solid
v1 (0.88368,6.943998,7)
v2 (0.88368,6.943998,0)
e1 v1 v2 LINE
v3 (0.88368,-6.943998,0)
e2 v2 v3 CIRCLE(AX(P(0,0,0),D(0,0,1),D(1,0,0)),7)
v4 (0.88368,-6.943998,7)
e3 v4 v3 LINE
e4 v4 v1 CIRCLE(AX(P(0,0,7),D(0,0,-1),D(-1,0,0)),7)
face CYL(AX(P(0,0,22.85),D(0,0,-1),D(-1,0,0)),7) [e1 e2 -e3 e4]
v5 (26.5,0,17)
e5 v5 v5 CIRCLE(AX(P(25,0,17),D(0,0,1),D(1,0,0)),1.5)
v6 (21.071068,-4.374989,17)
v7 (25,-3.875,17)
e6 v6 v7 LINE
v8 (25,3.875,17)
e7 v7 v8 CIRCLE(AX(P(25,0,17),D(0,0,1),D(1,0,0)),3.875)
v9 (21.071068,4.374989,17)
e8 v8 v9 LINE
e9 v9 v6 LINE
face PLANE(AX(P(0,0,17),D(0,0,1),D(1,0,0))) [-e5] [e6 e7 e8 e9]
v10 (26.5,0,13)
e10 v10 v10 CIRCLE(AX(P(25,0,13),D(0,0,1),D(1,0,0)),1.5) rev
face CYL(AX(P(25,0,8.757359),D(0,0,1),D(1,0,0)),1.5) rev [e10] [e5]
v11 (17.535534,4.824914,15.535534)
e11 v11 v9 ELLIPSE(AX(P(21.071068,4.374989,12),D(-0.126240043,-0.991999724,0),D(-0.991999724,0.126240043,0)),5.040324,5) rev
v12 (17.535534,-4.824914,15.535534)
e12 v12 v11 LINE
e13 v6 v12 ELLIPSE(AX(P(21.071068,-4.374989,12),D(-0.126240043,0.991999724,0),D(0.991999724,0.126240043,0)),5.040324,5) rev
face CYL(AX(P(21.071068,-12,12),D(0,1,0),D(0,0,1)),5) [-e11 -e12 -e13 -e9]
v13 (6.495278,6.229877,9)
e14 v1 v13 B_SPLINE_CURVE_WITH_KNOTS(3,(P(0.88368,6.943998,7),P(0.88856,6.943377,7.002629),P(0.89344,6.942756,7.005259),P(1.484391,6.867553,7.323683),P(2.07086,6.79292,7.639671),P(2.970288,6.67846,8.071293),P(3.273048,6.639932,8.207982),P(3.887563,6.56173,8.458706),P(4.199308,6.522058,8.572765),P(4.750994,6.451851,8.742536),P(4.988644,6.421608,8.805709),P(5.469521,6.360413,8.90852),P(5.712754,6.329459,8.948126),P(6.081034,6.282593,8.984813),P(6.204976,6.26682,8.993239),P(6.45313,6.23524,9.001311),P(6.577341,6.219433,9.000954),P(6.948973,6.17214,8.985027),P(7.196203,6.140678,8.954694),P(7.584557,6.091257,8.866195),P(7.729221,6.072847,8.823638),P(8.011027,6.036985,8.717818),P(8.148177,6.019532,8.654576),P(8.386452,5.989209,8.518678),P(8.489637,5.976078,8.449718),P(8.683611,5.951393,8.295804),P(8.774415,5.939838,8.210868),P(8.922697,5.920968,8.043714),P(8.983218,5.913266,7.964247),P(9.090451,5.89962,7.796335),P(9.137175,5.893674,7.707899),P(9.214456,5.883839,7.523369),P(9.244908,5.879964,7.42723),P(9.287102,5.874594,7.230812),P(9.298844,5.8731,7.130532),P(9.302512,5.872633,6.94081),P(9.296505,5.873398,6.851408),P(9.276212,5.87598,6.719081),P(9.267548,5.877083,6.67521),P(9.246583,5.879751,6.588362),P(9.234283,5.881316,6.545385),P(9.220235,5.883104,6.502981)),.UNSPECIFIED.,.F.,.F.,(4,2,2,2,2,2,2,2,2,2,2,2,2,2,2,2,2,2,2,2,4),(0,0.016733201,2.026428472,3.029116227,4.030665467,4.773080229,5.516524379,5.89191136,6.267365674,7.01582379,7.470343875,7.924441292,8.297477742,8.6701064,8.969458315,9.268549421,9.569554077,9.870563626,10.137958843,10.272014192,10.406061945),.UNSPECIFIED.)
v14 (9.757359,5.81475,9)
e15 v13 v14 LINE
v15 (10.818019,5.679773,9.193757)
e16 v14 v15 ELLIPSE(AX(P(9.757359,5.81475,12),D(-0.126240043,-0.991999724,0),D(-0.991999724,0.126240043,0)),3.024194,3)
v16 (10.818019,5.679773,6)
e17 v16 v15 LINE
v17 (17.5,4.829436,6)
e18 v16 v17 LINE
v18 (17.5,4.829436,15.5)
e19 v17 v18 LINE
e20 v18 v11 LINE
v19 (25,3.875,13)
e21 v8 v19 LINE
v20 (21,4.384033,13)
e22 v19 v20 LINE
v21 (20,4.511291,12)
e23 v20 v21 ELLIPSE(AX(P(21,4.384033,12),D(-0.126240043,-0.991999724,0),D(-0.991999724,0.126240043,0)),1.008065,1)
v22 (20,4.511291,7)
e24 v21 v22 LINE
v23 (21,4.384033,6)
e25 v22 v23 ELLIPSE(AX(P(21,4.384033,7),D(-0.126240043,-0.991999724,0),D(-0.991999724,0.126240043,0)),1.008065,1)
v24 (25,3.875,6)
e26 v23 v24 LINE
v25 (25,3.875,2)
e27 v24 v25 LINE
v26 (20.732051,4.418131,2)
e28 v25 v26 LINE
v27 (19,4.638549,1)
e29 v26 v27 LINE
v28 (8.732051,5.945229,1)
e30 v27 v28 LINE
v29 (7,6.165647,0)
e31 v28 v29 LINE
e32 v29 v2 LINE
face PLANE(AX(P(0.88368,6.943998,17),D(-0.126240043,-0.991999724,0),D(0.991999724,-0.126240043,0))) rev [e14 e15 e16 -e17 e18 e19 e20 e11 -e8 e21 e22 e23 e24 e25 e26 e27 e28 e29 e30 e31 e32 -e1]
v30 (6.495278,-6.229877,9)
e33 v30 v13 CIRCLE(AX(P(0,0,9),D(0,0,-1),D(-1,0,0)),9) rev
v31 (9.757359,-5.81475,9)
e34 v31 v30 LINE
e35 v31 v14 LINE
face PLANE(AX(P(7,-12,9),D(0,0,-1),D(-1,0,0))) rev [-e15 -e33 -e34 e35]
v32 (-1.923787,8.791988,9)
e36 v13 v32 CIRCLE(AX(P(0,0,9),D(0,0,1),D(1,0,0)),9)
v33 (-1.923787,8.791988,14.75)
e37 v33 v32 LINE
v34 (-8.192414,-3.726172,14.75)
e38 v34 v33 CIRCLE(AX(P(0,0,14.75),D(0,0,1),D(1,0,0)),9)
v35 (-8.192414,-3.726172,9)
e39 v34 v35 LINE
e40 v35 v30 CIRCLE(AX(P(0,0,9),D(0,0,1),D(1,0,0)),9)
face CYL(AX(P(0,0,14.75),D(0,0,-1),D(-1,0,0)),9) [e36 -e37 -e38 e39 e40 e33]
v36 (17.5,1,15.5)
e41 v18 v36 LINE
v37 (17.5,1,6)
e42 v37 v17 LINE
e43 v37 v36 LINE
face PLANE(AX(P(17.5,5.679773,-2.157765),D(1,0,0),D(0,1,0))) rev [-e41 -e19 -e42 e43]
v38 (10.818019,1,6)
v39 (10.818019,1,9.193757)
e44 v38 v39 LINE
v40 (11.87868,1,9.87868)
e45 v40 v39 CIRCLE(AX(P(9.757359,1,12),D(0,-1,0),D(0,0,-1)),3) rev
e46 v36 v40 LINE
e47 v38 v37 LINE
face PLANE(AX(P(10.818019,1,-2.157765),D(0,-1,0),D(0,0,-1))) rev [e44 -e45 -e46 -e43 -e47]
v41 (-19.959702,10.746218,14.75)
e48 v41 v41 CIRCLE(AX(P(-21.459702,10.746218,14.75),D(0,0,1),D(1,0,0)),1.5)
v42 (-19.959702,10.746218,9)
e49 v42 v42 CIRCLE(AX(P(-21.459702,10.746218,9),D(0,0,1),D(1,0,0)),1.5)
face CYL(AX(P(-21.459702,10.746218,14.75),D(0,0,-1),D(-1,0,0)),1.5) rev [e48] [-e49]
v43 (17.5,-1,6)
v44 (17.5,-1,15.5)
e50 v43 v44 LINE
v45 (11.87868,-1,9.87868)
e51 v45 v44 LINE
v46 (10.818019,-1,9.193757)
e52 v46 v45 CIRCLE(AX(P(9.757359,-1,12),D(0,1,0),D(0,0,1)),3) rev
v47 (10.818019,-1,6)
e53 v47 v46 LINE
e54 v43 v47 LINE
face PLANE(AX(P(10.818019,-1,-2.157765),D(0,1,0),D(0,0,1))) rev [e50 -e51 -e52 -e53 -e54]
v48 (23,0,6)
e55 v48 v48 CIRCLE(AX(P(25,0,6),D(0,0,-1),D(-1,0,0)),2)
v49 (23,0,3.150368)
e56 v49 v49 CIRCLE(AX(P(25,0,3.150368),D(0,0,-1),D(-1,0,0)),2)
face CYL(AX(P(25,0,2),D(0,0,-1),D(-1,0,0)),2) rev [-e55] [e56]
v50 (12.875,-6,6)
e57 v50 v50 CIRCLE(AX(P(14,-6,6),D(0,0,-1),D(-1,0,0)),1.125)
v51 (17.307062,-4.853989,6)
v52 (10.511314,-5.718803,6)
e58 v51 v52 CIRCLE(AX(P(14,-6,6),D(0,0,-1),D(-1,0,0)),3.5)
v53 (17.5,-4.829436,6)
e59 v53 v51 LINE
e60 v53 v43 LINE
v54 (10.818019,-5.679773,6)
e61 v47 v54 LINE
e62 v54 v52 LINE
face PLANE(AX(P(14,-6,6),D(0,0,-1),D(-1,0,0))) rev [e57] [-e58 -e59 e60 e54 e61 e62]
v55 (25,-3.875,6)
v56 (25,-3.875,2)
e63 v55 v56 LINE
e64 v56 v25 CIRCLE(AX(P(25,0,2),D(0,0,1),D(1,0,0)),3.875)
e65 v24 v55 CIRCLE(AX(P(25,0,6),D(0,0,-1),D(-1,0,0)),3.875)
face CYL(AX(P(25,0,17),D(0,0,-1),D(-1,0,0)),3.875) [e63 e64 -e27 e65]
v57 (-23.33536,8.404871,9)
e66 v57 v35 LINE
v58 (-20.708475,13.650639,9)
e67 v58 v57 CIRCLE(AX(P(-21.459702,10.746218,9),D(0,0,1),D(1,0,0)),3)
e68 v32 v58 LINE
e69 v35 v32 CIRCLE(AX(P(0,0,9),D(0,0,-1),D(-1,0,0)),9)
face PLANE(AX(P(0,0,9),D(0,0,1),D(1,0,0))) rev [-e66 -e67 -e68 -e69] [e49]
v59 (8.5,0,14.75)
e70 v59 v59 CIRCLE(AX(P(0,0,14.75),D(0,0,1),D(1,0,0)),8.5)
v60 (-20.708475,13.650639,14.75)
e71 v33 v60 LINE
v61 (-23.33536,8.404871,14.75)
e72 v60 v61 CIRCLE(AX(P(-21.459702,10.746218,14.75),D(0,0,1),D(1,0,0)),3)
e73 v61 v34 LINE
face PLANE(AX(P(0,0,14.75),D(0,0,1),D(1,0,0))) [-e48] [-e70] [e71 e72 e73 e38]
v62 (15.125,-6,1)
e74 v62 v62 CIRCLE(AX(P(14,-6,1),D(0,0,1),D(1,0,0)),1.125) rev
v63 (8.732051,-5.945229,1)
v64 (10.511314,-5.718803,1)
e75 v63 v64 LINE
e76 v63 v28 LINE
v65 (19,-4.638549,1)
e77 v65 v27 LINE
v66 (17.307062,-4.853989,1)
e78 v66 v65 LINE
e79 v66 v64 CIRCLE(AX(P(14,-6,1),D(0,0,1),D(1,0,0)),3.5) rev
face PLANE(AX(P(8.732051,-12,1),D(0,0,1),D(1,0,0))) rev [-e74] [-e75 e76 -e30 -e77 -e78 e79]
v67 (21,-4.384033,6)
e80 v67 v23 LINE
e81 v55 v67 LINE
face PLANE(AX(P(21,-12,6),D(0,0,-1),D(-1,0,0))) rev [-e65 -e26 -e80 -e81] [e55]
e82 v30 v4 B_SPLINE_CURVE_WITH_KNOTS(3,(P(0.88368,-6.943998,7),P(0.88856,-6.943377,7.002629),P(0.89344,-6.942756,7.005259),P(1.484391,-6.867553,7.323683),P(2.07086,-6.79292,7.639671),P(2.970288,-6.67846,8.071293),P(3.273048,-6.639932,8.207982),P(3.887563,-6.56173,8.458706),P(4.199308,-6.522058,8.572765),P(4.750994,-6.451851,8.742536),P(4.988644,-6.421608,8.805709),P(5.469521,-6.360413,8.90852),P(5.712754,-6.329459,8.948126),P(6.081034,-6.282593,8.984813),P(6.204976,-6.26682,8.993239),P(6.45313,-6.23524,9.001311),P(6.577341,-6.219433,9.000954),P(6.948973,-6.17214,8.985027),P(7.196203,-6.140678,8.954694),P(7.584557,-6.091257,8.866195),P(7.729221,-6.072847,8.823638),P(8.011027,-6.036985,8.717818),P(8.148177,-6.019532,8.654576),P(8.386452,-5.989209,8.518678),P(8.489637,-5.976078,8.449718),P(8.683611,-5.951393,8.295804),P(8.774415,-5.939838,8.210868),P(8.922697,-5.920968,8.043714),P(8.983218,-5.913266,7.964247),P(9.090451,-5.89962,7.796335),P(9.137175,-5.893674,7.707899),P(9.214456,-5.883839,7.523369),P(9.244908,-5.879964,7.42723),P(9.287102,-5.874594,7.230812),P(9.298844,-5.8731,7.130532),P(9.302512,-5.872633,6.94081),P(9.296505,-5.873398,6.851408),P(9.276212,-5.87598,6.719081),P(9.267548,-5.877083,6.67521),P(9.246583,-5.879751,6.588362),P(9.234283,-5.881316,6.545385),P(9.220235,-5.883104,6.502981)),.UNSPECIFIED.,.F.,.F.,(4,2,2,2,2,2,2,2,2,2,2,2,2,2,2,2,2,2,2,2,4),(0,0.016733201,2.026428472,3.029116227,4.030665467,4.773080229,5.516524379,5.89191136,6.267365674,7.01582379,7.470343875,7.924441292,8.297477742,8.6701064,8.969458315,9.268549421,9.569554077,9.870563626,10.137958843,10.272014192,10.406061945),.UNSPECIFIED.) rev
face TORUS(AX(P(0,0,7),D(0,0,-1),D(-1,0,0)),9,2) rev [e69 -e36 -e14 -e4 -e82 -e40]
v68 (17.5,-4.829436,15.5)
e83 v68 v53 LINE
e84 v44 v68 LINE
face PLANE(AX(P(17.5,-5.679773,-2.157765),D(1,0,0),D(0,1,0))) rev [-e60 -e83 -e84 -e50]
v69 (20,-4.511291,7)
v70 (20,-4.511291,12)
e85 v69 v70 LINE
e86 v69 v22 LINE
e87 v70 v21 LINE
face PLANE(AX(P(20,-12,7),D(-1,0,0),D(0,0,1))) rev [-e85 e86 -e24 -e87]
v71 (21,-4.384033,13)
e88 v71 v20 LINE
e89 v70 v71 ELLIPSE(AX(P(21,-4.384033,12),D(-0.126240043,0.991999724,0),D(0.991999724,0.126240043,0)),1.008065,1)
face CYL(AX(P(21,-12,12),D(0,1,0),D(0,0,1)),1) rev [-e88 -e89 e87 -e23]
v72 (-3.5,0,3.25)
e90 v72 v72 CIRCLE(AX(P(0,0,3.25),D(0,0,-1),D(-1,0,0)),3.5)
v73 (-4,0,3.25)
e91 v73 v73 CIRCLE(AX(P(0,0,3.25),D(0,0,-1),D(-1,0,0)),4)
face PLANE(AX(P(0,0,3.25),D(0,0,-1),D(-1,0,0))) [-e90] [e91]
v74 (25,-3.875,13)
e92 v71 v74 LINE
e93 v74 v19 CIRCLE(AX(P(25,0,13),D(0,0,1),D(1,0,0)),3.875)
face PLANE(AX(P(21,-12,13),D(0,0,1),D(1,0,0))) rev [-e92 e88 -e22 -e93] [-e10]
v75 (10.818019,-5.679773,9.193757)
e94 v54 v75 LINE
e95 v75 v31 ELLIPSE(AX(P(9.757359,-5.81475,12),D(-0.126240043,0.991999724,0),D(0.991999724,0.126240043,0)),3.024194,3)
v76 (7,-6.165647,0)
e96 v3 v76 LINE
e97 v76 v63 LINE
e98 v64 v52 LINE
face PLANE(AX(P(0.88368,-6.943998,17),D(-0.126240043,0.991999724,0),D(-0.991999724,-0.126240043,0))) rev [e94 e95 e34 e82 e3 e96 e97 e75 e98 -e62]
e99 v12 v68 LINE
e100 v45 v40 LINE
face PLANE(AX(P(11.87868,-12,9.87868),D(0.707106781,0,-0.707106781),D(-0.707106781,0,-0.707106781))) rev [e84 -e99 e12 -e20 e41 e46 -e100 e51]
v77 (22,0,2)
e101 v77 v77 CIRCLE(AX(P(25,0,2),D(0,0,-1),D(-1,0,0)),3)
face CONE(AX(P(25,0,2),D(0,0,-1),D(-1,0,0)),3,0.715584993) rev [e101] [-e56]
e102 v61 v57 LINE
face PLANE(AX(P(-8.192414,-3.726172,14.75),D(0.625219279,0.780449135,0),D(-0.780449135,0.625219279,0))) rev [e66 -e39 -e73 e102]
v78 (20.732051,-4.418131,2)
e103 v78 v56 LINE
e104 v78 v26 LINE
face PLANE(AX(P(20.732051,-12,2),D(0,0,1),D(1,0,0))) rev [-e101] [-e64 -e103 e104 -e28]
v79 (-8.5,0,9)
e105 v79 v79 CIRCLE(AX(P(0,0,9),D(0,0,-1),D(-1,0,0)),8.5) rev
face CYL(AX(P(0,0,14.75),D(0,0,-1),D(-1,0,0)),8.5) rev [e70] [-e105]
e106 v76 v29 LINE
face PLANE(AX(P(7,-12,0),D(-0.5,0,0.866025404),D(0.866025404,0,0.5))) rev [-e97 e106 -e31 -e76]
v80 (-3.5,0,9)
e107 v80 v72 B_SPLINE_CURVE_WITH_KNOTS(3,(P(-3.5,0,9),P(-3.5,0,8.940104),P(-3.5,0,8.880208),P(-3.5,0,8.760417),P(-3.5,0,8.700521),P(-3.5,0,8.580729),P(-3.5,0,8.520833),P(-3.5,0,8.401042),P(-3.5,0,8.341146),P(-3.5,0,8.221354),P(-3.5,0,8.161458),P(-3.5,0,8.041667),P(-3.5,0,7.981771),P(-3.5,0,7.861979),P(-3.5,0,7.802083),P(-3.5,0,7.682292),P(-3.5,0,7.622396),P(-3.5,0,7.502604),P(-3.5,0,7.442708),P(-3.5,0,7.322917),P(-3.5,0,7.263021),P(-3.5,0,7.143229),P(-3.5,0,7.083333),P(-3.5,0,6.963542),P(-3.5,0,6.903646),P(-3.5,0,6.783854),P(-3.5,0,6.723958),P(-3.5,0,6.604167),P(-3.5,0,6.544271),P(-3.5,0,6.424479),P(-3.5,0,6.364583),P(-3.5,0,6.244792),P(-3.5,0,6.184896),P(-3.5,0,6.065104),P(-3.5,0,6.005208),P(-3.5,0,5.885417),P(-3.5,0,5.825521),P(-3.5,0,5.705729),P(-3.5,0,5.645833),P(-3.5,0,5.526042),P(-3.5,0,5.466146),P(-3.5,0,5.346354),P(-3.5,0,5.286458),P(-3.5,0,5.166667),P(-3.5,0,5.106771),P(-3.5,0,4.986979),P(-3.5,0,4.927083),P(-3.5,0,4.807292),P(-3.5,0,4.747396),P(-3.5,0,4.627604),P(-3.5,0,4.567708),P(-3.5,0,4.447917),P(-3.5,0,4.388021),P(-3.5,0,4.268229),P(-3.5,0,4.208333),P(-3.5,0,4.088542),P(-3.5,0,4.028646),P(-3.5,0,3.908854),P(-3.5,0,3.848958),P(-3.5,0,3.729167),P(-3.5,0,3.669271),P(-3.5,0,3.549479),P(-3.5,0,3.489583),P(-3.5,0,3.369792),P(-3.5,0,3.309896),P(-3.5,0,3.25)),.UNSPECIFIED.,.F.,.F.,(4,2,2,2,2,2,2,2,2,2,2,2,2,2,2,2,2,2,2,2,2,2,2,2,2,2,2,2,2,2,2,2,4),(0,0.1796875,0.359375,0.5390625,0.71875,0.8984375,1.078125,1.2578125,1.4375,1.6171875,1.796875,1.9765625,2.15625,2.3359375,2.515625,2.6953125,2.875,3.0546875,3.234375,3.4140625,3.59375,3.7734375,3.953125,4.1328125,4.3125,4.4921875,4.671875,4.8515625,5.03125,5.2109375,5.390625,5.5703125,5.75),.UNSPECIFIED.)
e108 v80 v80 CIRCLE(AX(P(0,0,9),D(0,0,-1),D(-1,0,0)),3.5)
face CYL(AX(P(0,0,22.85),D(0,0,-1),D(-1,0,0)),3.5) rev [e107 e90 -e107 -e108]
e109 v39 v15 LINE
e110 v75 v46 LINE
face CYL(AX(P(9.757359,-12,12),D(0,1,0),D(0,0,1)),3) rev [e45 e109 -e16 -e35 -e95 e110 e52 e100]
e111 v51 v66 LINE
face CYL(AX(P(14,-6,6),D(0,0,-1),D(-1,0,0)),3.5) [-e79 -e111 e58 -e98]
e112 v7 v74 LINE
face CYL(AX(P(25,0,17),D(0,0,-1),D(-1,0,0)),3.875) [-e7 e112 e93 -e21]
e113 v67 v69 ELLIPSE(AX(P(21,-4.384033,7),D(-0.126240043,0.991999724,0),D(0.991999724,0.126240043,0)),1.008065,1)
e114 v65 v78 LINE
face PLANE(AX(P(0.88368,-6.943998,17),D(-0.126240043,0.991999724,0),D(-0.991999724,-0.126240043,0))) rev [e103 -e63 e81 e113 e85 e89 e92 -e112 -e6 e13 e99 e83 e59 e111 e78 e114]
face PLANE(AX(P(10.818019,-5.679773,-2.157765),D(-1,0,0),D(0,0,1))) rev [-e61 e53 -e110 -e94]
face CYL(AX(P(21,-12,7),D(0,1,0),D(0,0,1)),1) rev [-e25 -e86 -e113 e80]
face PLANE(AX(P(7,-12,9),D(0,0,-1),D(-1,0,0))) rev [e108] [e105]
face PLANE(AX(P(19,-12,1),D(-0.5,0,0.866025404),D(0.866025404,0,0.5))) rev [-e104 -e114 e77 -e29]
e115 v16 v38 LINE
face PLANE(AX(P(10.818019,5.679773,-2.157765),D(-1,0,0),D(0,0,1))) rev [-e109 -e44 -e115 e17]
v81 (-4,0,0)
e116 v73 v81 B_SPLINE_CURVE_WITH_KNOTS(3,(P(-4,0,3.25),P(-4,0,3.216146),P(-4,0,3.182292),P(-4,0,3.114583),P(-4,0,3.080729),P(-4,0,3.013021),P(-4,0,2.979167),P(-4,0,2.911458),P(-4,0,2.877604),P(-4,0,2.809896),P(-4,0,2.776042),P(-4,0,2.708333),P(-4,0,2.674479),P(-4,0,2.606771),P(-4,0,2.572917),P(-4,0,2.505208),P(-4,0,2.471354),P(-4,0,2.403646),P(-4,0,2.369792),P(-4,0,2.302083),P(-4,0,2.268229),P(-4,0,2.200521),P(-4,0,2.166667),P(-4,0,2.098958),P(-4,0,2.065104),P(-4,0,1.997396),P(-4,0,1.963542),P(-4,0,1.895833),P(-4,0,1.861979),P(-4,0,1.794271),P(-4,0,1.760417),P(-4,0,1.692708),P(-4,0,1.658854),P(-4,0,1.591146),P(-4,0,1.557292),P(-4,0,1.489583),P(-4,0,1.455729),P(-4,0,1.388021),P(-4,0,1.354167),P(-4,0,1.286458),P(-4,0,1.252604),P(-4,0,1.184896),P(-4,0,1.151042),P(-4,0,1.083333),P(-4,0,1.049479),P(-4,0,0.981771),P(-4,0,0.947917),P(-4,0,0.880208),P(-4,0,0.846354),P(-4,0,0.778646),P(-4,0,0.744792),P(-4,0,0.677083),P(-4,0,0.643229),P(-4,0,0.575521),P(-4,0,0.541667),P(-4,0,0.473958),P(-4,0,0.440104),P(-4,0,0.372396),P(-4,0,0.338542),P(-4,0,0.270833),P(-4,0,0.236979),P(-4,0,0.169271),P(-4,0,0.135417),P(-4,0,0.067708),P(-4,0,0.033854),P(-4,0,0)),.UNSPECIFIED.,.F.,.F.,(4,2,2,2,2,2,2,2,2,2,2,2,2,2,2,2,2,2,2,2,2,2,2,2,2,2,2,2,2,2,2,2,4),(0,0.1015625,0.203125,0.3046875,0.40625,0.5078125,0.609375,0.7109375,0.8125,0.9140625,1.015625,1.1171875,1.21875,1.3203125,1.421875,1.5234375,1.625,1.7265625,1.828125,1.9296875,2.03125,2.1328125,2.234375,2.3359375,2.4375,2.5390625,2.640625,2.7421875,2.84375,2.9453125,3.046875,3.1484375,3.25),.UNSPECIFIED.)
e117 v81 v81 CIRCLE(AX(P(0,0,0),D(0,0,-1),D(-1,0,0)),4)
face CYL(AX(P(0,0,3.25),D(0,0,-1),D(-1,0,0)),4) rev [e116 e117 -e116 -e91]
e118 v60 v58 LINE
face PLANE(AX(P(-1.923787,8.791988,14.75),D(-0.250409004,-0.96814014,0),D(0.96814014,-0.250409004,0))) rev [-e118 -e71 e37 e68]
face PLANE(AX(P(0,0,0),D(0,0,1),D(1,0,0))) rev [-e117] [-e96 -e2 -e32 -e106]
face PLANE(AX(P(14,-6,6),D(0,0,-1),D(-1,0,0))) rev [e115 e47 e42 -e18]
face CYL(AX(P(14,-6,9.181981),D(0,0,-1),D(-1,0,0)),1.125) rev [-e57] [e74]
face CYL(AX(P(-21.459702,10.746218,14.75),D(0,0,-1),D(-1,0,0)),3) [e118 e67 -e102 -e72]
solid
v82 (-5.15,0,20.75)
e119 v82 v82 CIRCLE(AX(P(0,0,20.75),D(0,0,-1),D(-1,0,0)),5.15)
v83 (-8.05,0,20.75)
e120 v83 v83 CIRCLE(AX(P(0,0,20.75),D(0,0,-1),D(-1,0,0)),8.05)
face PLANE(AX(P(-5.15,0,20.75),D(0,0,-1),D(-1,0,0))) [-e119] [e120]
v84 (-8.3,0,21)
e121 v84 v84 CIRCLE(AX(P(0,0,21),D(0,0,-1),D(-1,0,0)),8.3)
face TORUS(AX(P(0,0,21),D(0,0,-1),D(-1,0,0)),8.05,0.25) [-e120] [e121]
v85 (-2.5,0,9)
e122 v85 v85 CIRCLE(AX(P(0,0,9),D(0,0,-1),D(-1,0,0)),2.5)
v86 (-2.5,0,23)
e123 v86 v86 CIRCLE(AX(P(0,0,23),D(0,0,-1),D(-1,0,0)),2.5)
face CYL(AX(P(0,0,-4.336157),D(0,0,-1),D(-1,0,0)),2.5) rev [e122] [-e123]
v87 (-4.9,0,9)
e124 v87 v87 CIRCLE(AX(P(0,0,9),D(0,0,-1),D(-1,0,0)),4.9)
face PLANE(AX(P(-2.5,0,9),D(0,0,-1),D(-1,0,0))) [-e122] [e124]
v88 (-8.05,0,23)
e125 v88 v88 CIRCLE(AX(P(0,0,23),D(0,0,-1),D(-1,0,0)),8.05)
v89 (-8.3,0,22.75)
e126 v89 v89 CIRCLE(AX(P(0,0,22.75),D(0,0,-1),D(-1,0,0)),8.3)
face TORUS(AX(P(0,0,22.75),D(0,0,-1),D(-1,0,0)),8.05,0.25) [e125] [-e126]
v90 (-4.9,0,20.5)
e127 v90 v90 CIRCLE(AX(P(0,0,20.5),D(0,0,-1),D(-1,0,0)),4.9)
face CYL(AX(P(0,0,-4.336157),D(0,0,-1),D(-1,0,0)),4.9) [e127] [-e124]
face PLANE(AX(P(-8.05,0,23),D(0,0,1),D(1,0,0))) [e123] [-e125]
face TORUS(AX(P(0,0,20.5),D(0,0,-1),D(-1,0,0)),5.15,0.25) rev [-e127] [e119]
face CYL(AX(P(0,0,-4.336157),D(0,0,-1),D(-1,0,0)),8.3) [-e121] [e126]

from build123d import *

# Parameters (mm, degrees)
SKETCH1_R                = 7
SKETCH1_R_2              = 3.5
CYLINDER_DEPTH           = 22.85
SKETCH2_R                = 4
BORE_1_DEPTH             = 3.25
BORE_START               = -3.25
SKETCH3_R                = 4
BORE_2_DEPTH             = 3.25
ARM_DEPTH                = 17
SKETCH5_R                = 3.5
OUTER_HOLE_SURFACE_DEPTH = 6
SKETCH6_R                = 1.125
OUTER_HOLE_DEPTH         = 6
SIDE_FEATURES_DEPTH      = 22
RIB_START                = -11
SKETCH10_W               = 6.681980515
SKETCH10_H               = 4.679772507
RIB_DEPTH                = 9.5
SKETCH13_R               = 1.5
BOTTOM_HOLE_DEPTH        = 4
MODIFY_START             = -17
SKETCH14_W               = 14
SKETCH14_H               = 13.85
MODIFY_1ST_POST_DEPTH    = 14
SKETCH16_R               = 8.5
SKETCH16_R_2             = 1.5
ARM_2_DEPTH              = 5.75


# Read off the part's stored shape, not the designer's step: Top Counter-sunk
with BuildPart() as part:
    # Sketch1 → Cylinder (new body)
    with BuildSketch(Plane.XY):
        with Locations(Location((0, 0, 0), (0, 0, 180))):
            Circle(SKETCH1_R)
        with Locations(Location((0, 0, 0), (0, 0, 180))):
            Circle(SKETCH1_R_2, mode=Mode.SUBTRACT)
    extrude(amount=CYLINDER_DEPTH)

    # Sketch2 → Bore 1 (cut)
    with BuildSketch(Plane.XY.offset(22.85)):
        Circle(SKETCH2_R)
    extrude(amount=-BORE_1_DEPTH, mode=Mode.SUBTRACT)

    # Sketch3 → Bore 2 (cut)
    with BuildSketch(Plane(origin=(0, 0, 0), x_dir=(-1, 0, 0), z_dir=(0, 0, -1)).offset(BORE_START)):
        with Locations(Location((0, 0, 0), (0, 0, 180))):
            Circle(SKETCH3_R)
    extrude(amount=BORE_2_DEPTH, mode=Mode.SUBTRACT)

    # Sketch4 → Arm (add)
    with BuildSketch(Plane.XY):
        with BuildLine():
            Line((0.8836803, 6.943998065), (25, 3.875))
            ThreePointArc((25, 3.875), (28.875, 0), (25, -3.875))
            Line((25, -3.875), (0.8836803, -6.943998065))
            ThreePointArc((0.8836803, -6.943998065), (7, 0), (0.8836803, 6.943998065))
        make_face()
    extrude(amount=ARM_DEPTH)

    # Sketch5 → Outer Hole surface (add)
    with BuildSketch(Plane(origin=(0, 0, 0), x_dir=(-1, 0, 0), z_dir=(0, 0, -1))):
        with Locations((-14, -6)):
            Circle(SKETCH5_R)
    extrude(amount=-OUTER_HOLE_SURFACE_DEPTH)

    # Sketch6 → Outer hole (cut)
    with BuildSketch(Plane(origin=(0, 0, 0), x_dir=(-1, 0, 0), z_dir=(0, 0, -1))):
        with Locations((-14, -6)):
            Circle(SKETCH6_R)
    extrude(amount=-OUTER_HOLE_DEPTH, mode=Mode.SUBTRACT)

    # Sketch8 → side Features (cut)
    with BuildSketch(Plane(origin=(0, 10, 0), x_dir=(1, 0, 0), z_dir=(0, 1, 0))):
        with BuildLine():
            Line((21, -6), (40, -6))
            Line((40, -6), (40, -13))
            Line((40, -13), (21, -13))
            ThreePointArc((21, -13), (20.292893219, -12.707106781), (20, -12))
            Line((20, -12), (20, -7))
            ThreePointArc((20, -7), (20.292893219, -6.292893219), (21, -6))
        make_face()
        with BuildLine():
            Line((7, -19), (7, -9))
            Line((7, -9), (9.757359313, -9))
            ThreePointArc((9.757359313, -9), (10.90540961, -9.228361402), (11.878679656, -9.878679656))
            Line((11.878679656, -9.878679656), (17.535533906, -15.535533906))
            ThreePointArc((17.535533906, -15.535533906), (19.15765065, -16.619397663), (21.071067812, -17))
            Line((21.071067812, -17), (27, -17))
            Line((27, -17), (27, -19))
            Line((27, -19), (7, -19))
        make_face()
        Polygon((7, 0), (8.732050808, -1), (19, -1), (20.732050808, -2), (40, -2), (40, 0), align=None)
    extrude(amount=-SIDE_FEATURES_DEPTH, mode=Mode.SUBTRACT)

    # Sketch10 → Rib (cut)
    with BuildSketch(Plane.XY.offset(17).offset(RIB_START)):
        with Locations((14.159009743, 3.339886254)):
            Rectangle(SKETCH10_W, SKETCH10_H)
        with Locations((14.159009743, -3.339886254)):
            Rectangle(SKETCH10_W, SKETCH10_H)
    extrude(amount=RIB_DEPTH, mode=Mode.SUBTRACT)

    # Top Counter-sunk outline → Top Counter-sunk (revolve, cut)
    with BuildSketch(Plane(origin=(25, 0, 0), x_dir=(1, 0, 0), z_dir=(0, -1, 0))):
        Polygon((2, 3.150368407), (2, 6), (0, 6), (0, 2), (3, 2), align=None)
    revolve(axis=Axis((25, 0, 0), (0, 0, 1)), mode=Mode.SUBTRACT)

    # Sketch13 → Bottom hole (cut)
    with BuildSketch(Plane.XY.offset(17)):
        with Locations((25, 0)):
            Circle(SKETCH13_R)
    extrude(amount=-BOTTOM_HOLE_DEPTH, mode=Mode.SUBTRACT)

    # Sketch14 → Modify 1st Post (cut)
    with BuildSketch(Plane(origin=(0, 10, 0), x_dir=(1, 0, 0), z_dir=(0, 1, 0)).offset(MODIFY_START)):
        with Locations((0, -15.925)):
            Rectangle(SKETCH14_W, SKETCH14_H)
    extrude(amount=MODIFY_1ST_POST_DEPTH, mode=Mode.SUBTRACT)

    # Sketch16 → Arm 2 (add)
    with BuildSketch(Plane.XY.offset(9)):
        with BuildLine():
            Line((-1.923786579, 8.791987557), (-20.708474673, 13.650638528))
            ThreePointArc((-20.708474673, 13.650638528), (-24.142164395, 12.089495372), (-23.335359521, 8.404870702))
            Line((-23.335359521, 8.404870702), (-8.192413809, -3.726171759))
            ThreePointArc((-8.192413809, -3.726171759), (8.047388132, -4.029831791), (-1.923786579, 8.791987557))
        make_face()
        with Locations(Location((0, 0, 0), (0, 0, 48.187305897))):
            Circle(SKETCH16_R, mode=Mode.SUBTRACT)
        with Locations((-21.459701684, 10.746218108)):
            Circle(SKETCH16_R_2, mode=Mode.SUBTRACT)
    extrude(amount=ARM_2_DEPTH)

    # Sketch18 → Connect Arm 2 (revolve)
    with BuildSketch(Plane(origin=(0, 0, 0), x_dir=(1, 0, 0), z_dir=(0, 1, 0))):
        with BuildLine():
            Line((-7, -7), (-7, -9))
            Line((-7, -9), (-9, -9))
            ThreePointArc((-9, -9), (-7.585786438, -8.414213562), (-7, -7))
        make_face()
    revolve(axis=Axis((0, 0, -2.563667384), (0, 0, 1)))


with BuildPart() as body_2:
    # Sketch19 → Base (revolve)
    with BuildSketch(Plane(origin=(0, 0, 0), x_dir=(1, 0, 0), z_dir=(0, 1, 0))):
        with BuildLine():
            Line((-4.9, -9), (-4.9, -20.5))
            ThreePointArc((-4.9, -20.5), (-4.973223305, -20.676776695), (-5.15, -20.75))
            Line((-5.15, -20.75), (-8.05, -20.75))
            ThreePointArc((-8.05, -20.75), (-8.226776695, -20.823223305), (-8.3, -21))
            Line((-8.3, -21), (-8.3, -22.75))
            ThreePointArc((-8.3, -22.75), (-8.226776695, -22.926776695), (-8.05, -23))
            Line((-8.05, -23), (-2.5, -23))
            Line((-2.5, -23), (-2.5, -9))
            Line((-2.5, -9), (-4.9, -9))
        make_face()
    revolve(axis=Axis((0, 0, -4.336156577), (0, 0, 1)))


solid = Compound([part.part, body_2.part])
